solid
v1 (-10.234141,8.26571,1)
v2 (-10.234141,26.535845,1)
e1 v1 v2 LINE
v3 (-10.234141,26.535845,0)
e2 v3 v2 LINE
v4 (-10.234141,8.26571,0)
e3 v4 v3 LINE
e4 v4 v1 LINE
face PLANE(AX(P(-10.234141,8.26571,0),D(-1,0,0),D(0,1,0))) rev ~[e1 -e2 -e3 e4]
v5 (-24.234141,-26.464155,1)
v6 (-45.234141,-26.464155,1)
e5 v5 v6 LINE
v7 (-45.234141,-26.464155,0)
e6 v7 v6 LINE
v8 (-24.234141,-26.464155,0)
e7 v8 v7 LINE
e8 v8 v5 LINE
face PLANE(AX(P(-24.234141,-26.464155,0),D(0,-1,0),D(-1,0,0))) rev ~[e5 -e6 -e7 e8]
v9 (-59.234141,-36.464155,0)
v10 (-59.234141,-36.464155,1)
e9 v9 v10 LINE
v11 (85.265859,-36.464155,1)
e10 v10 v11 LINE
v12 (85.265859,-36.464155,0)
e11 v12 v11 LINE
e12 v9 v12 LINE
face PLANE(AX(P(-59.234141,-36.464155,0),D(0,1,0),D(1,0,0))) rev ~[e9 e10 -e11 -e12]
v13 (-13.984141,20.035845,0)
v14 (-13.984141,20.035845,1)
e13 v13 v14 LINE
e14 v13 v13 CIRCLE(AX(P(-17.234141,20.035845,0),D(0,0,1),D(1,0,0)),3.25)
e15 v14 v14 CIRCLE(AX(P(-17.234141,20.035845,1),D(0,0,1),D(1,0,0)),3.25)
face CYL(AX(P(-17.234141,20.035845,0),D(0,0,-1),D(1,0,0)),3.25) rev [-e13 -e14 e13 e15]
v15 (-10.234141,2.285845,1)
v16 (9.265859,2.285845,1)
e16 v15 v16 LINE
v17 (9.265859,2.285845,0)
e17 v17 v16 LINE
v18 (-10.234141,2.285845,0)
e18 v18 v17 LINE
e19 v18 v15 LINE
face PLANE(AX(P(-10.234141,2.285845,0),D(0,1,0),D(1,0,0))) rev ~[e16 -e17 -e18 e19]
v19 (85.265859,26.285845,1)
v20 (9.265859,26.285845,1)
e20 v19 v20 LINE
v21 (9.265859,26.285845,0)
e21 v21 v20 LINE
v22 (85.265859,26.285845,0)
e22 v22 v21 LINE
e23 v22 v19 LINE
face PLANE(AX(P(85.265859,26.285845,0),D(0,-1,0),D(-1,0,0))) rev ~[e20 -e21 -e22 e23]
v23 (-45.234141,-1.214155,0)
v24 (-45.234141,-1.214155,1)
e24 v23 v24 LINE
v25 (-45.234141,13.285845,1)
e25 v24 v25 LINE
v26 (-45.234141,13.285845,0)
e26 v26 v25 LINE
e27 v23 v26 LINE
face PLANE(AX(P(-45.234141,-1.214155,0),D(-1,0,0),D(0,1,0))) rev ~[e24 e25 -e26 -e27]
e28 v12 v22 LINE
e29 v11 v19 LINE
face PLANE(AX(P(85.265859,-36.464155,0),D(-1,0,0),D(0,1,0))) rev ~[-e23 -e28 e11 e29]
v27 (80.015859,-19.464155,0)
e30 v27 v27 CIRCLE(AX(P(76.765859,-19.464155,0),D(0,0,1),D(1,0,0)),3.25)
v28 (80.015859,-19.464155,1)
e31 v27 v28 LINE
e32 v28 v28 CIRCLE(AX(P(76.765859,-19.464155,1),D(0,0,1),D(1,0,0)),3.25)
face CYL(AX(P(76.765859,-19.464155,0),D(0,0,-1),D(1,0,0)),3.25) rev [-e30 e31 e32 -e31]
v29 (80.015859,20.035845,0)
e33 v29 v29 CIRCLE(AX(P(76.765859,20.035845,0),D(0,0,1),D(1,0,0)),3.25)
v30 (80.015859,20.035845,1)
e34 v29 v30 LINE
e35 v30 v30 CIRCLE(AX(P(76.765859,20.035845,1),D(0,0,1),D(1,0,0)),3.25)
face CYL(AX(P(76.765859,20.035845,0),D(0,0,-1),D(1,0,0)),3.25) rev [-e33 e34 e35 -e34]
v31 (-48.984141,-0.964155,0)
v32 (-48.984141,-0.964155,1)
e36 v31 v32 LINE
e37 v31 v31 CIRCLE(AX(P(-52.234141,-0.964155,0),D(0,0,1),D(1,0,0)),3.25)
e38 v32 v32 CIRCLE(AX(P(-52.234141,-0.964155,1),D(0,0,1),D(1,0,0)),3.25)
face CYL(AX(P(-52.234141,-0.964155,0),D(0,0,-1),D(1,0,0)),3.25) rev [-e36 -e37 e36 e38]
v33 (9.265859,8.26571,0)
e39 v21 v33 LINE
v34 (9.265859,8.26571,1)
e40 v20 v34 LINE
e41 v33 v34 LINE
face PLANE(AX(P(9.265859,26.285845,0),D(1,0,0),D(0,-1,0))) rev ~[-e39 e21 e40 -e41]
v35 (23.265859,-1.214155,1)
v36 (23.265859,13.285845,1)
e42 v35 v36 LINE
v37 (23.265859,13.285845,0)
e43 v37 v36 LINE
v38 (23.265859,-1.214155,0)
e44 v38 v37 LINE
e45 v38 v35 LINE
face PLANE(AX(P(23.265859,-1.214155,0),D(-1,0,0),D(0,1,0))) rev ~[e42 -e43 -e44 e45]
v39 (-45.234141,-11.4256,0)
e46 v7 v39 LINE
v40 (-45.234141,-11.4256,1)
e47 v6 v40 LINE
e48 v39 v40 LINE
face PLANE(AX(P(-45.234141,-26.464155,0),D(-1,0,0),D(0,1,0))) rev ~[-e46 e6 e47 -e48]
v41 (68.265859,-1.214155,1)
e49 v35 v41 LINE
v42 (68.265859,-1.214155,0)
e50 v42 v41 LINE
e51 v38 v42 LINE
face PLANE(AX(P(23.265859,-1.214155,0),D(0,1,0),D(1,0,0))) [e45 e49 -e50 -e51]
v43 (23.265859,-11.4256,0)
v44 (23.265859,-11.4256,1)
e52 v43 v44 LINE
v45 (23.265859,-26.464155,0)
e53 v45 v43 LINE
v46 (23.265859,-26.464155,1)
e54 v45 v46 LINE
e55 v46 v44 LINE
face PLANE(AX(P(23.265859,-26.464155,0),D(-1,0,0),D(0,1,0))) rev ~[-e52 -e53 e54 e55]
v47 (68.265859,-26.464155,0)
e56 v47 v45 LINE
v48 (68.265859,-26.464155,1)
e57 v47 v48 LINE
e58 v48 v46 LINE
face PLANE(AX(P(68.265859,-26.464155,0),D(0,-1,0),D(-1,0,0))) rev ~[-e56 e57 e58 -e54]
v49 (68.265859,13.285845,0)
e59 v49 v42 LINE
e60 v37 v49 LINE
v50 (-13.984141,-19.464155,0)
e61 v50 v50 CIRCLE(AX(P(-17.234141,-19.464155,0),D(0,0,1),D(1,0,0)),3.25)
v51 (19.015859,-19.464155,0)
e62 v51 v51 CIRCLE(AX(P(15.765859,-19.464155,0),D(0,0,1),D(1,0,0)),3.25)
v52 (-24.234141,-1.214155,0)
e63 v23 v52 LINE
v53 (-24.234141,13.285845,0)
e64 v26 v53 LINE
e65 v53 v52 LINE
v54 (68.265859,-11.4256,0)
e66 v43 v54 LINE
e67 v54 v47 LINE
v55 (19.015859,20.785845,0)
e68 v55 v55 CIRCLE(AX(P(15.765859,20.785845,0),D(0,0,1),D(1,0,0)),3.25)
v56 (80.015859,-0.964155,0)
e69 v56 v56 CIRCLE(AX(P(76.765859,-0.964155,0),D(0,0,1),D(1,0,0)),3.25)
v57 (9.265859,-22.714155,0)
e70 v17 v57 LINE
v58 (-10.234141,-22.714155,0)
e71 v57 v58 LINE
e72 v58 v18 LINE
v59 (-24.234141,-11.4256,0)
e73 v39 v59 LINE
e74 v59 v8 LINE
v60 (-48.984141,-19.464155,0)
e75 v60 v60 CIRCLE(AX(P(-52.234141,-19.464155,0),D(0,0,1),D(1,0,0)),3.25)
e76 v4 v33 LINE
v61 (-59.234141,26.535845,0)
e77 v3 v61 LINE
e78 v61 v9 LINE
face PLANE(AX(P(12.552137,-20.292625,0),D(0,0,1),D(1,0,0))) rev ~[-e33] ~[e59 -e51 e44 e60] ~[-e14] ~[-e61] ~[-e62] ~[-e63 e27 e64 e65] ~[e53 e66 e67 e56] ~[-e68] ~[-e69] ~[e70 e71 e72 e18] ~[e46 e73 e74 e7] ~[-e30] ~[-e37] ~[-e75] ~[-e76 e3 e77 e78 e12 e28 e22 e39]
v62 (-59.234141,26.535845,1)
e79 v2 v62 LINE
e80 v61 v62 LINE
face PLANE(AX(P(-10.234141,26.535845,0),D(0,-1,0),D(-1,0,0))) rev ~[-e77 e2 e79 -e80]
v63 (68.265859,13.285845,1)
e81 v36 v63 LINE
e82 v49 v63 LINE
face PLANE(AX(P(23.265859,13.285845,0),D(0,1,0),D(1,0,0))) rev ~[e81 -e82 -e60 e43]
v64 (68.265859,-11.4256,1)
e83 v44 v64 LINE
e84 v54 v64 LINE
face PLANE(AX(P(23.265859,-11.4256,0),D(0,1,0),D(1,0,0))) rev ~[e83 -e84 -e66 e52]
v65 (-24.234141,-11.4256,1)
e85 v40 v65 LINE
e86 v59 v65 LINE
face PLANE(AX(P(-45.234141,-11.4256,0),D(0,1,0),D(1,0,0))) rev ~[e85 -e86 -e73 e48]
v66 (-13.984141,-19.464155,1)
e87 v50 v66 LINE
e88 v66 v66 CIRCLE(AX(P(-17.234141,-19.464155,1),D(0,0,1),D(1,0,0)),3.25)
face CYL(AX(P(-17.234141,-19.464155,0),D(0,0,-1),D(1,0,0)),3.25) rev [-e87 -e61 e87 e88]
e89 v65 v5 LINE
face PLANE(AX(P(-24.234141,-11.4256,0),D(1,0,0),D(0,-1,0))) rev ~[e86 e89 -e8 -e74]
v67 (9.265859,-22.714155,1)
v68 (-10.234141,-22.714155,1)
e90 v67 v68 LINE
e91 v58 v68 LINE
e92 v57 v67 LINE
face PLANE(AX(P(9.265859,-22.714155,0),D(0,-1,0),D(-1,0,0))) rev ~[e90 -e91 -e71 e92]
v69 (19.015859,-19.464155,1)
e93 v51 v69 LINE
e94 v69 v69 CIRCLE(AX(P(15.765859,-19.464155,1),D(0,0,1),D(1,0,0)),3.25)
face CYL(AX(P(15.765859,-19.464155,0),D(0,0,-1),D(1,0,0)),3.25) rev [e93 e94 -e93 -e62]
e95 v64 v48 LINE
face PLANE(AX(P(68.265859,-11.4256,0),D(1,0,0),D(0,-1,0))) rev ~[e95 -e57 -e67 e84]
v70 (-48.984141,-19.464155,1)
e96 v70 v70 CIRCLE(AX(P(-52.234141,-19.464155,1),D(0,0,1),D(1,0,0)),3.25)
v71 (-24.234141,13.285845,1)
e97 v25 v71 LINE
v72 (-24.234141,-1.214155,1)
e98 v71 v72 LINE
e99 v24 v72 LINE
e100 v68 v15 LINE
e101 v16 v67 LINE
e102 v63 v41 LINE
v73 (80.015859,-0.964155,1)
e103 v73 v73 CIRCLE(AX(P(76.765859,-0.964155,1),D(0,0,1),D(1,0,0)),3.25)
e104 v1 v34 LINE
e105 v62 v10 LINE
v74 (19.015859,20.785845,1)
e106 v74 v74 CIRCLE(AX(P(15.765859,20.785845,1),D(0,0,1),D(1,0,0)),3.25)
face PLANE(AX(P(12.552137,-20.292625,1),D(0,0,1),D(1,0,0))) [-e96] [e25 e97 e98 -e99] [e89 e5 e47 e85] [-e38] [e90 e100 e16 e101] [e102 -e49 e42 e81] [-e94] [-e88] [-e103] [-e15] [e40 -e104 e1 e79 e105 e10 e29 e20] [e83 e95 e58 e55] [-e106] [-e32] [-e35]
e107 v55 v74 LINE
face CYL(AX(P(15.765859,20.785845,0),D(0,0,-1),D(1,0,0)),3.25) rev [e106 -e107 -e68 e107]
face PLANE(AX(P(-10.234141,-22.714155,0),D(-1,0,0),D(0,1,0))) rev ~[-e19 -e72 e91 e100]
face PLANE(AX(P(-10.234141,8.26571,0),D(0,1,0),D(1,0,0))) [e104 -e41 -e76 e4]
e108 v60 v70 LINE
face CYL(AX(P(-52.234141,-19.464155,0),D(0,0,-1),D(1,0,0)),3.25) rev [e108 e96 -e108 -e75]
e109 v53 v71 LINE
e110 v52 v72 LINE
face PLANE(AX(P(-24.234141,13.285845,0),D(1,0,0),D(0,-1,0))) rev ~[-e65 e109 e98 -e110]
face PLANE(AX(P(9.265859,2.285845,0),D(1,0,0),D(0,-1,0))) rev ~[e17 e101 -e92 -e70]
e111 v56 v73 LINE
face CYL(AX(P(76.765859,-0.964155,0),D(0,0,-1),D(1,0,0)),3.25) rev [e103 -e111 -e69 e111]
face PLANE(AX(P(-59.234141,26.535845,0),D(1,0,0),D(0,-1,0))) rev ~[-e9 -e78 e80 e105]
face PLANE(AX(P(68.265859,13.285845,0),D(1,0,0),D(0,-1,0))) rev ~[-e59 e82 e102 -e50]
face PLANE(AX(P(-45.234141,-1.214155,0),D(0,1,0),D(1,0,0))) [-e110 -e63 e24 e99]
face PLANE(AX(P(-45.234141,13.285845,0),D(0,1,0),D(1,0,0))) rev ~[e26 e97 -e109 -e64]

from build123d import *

# Parameters (mm, degrees)
F0_R     = 3.25
F0_W     = 21
F0_H     = 10.2114447155
F0_W_2   = 19.5
F0_H_2   = 5.9798656802
F0_W_3   = 45
F1_DEPTH = 1


# Not quite as in the source:
# - a feature names something its author has since deleted; it is built from what else it names


with BuildPart() as f1:
    # F0 (on Top) → F1 (new body)
    with BuildSketch(Plane.XY):
        Polygon((85.2658590674, -26.4641552444), (85.2658590674, 13.2858447556), (68.2658590674, 13.2858447556), (68.2658590674, -1.2141552444), (68.2658590674, -11.42559996), (68.2658590674, -26.4641552444), (23.2658590674, -26.4641552444), (9.2658590674, -26.4641552444), (9.2658590674, -22.7141552444), (-10.2341409326, -22.7141552444), (-10.2341409326, -26.4641552444), (-24.2341409326, -26.4641552444), (-45.2341409326, -26.4641552444), (-45.2341409326, -11.42559996), (-45.2341409326, -1.2141552444), (-45.2341409326, 13.2858447556), (-59.2341409326, 13.2858447556), (-59.2341409326, -26.4641552444), (-59.2341409326, -36.4641552444), (-24.2341409326, -36.4641552444), (85.2658590674, -36.4641552444), align=None)
        with Locations((-52.2341409326, -19.4641552444)):
            Circle(F0_R, mode=Mode.SUBTRACT)
        with Locations((76.7658590674, -19.4641552444)):
            Circle(F0_R, mode=Mode.SUBTRACT)
        with Locations((-52.2341409326, -0.9641552444)):
            Circle(F0_R, mode=Mode.SUBTRACT)
        with Locations((76.7658590674, -0.9641552444)):
            Circle(F0_R, mode=Mode.SUBTRACT)
        with Locations((-34.7341409326, -6.3198776022)):
            Rectangle(F0_W, F0_H)
        with Locations((-0.4841409326, 5.2757775957)):
            Rectangle(F0_W_2, F0_H_2)
        with Locations((45.7658590674, -6.3198776022)):
            Rectangle(F0_W_3, F0_H)
        Polygon((-24.2341409326, 13.2858447556), (-10.2341409326, 13.2858447556), (-10.2341409326, 26.5358447556), (-59.2341409326, 26.5358447556), (-59.2341409326, 13.2858447556), (-45.2341409326, 13.2858447556), align=None)
        with Locations((-17.2341409326, 20.0358447556)):
            Circle(F0_R, mode=Mode.SUBTRACT)
        Polygon((85.2658590674, 13.2858447556), (85.2658590674, 26.2858447556), (9.2658590674, 26.2858447556), (9.2658590674, 13.2858447556), (23.2658590674, 13.2858447556), (68.2658590674, 13.2858447556), align=None)
        with Locations((15.7658590674, 20.7858447556)):
            Circle(F0_R, mode=Mode.SUBTRACT)
        with Locations((76.7658590674, 20.0358447556)):
            Circle(F0_R, mode=Mode.SUBTRACT)
        Polygon((-10.2341409326, 2.2858447556), (-10.2341409326, 8.2657104358), (-10.2341409326, 13.2858447556), (-24.2341409326, 13.2858447556), (-24.2341409326, -1.2141552444), (-24.2341409326, -11.42559996), (-24.2341409326, -26.4641552444), (-10.2341409326, -26.4641552444), (-10.2341409326, -22.7141552444), align=None)
        with Locations((-17.2341409326, -19.4641552444)):
            Circle(F0_R, mode=Mode.SUBTRACT)
        Polygon((23.2658590674, 13.2858447556), (9.2658590674, 13.2858447556), (9.2658590674, 8.2657104358), (9.2658590674, 2.2858447556), (9.2658590674, -22.7141552444), (9.2658590674, -26.4641552444), (23.2658590674, -26.4641552444), (23.2658590674, -11.42559996), (23.2658590674, -1.2141552444), align=None)
        with Locations((15.7658590674, -19.4641552444)):
            Circle(F0_R, mode=Mode.SUBTRACT)
    extrude(amount=F1_DEPTH)


solid = f1.part
